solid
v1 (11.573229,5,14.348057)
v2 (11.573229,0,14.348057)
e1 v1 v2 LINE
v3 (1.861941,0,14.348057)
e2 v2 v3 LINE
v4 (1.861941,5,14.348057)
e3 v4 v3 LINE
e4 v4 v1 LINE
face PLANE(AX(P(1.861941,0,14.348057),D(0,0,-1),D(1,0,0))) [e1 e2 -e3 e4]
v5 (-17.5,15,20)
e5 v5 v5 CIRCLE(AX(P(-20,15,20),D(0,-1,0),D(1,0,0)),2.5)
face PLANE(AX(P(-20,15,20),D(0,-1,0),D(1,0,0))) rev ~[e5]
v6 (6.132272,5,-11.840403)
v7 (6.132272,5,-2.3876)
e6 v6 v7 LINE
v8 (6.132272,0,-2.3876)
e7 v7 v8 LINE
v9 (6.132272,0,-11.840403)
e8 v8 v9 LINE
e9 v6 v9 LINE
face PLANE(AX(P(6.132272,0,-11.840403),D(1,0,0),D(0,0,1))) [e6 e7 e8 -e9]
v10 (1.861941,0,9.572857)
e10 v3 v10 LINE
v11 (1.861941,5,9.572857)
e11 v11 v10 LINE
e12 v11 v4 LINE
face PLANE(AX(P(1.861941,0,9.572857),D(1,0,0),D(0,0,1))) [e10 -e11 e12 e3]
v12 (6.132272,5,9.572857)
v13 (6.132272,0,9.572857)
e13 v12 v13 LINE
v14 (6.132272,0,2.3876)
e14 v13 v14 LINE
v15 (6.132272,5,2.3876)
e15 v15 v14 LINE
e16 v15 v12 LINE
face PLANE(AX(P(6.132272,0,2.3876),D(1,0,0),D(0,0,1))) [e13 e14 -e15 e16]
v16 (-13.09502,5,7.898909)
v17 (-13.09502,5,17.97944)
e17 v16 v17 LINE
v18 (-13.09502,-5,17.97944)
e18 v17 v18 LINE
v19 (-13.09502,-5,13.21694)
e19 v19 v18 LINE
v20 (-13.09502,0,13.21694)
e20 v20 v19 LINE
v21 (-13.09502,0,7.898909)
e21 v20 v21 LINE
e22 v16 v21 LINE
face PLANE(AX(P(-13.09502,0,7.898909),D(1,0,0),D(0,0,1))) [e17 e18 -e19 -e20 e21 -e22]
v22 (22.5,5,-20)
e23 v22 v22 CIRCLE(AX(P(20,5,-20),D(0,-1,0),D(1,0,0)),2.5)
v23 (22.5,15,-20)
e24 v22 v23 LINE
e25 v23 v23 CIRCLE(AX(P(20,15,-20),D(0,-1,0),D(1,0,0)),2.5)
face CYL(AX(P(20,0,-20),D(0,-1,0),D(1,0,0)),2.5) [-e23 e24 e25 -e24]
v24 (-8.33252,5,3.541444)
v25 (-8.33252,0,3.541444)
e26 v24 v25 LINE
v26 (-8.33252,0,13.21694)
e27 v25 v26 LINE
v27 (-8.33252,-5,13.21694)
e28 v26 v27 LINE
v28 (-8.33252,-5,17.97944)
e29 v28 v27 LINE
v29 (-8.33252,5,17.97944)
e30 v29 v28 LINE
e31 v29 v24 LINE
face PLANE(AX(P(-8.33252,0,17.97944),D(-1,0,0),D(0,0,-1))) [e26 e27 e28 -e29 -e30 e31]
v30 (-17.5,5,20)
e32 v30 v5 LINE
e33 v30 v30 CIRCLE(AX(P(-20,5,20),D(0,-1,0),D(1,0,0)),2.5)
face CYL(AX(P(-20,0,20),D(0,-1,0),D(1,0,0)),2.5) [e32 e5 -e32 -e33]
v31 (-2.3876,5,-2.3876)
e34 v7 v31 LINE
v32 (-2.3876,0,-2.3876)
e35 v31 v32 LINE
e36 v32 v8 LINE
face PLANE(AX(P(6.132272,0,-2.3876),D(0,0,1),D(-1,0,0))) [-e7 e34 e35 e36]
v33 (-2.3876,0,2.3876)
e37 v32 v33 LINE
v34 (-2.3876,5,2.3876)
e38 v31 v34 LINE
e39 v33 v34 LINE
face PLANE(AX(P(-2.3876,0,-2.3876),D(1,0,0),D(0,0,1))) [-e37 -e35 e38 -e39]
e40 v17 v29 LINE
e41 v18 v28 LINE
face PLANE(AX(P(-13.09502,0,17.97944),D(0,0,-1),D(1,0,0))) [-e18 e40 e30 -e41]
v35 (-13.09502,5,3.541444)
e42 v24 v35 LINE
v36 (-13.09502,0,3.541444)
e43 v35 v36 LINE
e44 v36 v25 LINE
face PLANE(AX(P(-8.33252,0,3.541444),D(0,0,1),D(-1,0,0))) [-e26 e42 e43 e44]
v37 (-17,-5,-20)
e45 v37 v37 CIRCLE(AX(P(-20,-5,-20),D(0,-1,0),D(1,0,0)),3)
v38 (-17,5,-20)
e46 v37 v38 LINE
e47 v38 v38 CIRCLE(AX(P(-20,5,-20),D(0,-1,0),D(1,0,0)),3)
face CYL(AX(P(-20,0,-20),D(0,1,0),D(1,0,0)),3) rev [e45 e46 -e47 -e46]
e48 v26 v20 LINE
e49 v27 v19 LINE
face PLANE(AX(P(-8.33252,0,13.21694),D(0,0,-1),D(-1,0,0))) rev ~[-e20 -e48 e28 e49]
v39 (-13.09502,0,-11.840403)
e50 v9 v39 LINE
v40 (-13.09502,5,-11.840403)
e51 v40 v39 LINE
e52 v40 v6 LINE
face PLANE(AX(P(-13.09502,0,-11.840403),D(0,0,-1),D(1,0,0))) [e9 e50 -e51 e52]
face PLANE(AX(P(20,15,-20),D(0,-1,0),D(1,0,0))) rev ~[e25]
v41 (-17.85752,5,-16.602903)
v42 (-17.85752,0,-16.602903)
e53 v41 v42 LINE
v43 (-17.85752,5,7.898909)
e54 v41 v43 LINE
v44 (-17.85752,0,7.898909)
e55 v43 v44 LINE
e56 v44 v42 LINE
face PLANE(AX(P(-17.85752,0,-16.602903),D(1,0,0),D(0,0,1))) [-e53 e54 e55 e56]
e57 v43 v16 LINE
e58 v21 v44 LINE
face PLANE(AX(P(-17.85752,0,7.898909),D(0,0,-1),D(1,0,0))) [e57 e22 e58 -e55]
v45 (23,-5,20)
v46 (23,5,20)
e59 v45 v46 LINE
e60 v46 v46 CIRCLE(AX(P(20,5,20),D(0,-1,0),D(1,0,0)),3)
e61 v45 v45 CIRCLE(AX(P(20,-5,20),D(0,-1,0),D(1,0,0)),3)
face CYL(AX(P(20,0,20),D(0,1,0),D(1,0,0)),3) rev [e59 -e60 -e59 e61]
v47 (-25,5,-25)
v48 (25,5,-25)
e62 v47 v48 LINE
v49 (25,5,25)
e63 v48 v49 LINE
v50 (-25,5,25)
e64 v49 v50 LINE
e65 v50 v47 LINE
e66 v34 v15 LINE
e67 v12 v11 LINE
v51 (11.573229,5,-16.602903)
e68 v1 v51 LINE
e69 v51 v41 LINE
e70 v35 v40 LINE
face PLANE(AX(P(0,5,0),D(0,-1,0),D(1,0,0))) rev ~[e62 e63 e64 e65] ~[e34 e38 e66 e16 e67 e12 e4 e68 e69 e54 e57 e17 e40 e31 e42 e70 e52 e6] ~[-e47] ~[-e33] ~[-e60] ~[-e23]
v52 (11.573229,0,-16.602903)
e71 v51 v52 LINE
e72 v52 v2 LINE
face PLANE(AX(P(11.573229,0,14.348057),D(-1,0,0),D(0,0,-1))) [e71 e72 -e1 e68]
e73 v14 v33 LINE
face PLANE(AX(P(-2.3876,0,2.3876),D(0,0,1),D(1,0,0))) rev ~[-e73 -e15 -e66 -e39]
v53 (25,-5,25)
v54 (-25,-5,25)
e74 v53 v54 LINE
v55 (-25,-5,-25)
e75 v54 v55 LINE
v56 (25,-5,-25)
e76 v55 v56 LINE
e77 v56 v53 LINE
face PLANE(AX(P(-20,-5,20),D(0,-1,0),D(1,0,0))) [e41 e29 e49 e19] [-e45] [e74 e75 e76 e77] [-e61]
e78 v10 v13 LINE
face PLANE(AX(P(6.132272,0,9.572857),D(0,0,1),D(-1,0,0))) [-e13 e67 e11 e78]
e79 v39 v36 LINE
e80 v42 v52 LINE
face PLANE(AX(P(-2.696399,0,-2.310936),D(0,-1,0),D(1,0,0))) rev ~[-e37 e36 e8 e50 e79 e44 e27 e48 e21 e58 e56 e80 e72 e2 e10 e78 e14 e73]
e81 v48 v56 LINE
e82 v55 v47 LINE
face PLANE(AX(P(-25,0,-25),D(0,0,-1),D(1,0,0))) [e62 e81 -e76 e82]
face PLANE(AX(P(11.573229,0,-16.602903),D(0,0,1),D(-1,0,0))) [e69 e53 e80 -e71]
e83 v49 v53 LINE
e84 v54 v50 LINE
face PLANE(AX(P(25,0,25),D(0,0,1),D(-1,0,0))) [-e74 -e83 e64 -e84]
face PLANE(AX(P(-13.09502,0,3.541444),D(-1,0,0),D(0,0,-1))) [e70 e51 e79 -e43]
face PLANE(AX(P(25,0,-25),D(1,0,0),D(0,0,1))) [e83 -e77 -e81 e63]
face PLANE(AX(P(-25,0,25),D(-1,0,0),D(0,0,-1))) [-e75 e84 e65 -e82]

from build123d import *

# Parameters (mm, degrees)
F0_R          = 3
F0_R_2        = 2.5
F1_DEPTH      = 5
F0_W          = 4.7752
F0_H          = 4.7752
F2_DEPTH      = 5
F3_DEPTH      = 15
F3_DEPTH_BACK = 5


with BuildPart() as f1:
    # F0 (on Front) → F1 (new body, symmetric)
    with BuildSketch(Plane.XZ):
        Polygon((-25, -25), (25, -25), (25, 25), (-13.09502, 25), (-25, 25), align=None)
        with Locations((-20, -20)):
            Circle(F0_R, mode=Mode.SUBTRACT)
        with Locations((20, -20)):
            Circle(F0_R_2, mode=Mode.SUBTRACT)
        Polygon((-13.09502, 13.21694), (-13.09502, 17.97944), (-8.33252, 17.97944), (-8.33252, 13.21694), (-8.33252, 3.5414441053), (-13.09502, 3.5414441053), (-13.09502, -11.8404025305), (-4.4399380628, -11.8404025305), (6.1322724736, -11.8404025305), (6.1322724736, -2.3876), (2.3876, -2.3876), (-2.3876, -2.3876), (-2.3876, 2.3876), (2.3876, 2.3876), (6.1322724736, 2.3876), (6.1322724736, 9.5728570595), (1.8619408365, 9.5728570595), (1.8619408365, 14.3480570595), (8.9338924736, 14.3480570595), (11.5732288948, 14.3480570595), (11.5732288948, 13.8279201027), (11.5732288948, 9.2561525788), (11.5732288948, 2.3876), (11.5732288948, -2.3876), (11.5732288948, -16.6029025305), (-17.85752, -16.6029025305), (-17.85752, 3.5414441053), (-17.85752, 7.8989091825), (-13.09502, 7.8989091825), align=None, mode=Mode.SUBTRACT)
        with Locations((-20, 20)):
            Circle(F0_R_2, mode=Mode.SUBTRACT)
        with Locations((20, 20)):
            Circle(F0_R, mode=Mode.SUBTRACT)
    extrude(amount=F1_DEPTH, both=True)

    # F0 (on Front) → F2 (join)
    with BuildSketch(Plane.XZ):
        Polygon((-8.33252, 13.21694), (-13.09502, 13.21694), (-13.09502, 7.8989091825), (-17.85752, 7.8989091825), (-17.85752, 3.5414441053), (-17.85752, -16.6029025305), (11.5732288948, -16.6029025305), (11.5732288948, -2.3876), (11.5732288948, 2.3876), (11.5732288948, 9.2561525788), (11.5732288948, 13.8279201027), (11.5732288948, 14.3480570595), (8.9338924736, 14.3480570595), (1.8619408365, 14.3480570595), (1.8619408365, 9.5728570595), (6.1322724736, 9.5728570595), (6.1322724736, 2.3876), (2.3876, 2.3876), (2.3876, -2.3876), (6.1322724736, -2.3876), (6.1322724736, -11.8404025305), (-4.4399380628, -11.8404025305), (-13.09502, -11.8404025305), (-13.09502, 3.5414441053), (-8.33252, 3.5414441053), align=None)
        Rectangle(F0_W, F0_H)
    extrude(amount=F2_DEPTH)

    # F0 (on Front) → F3 (join, two sides)
    with BuildSketch(Plane.XZ) as f3_sk:
        with Locations((-20, 20)):
            Circle(F0_R_2)
        with Locations((20, -20)):
            Circle(F0_R_2)
    extrude(amount=-F3_DEPTH)
    extrude(f3_sk.sketch, amount=F3_DEPTH_BACK)


solid = f1.part
